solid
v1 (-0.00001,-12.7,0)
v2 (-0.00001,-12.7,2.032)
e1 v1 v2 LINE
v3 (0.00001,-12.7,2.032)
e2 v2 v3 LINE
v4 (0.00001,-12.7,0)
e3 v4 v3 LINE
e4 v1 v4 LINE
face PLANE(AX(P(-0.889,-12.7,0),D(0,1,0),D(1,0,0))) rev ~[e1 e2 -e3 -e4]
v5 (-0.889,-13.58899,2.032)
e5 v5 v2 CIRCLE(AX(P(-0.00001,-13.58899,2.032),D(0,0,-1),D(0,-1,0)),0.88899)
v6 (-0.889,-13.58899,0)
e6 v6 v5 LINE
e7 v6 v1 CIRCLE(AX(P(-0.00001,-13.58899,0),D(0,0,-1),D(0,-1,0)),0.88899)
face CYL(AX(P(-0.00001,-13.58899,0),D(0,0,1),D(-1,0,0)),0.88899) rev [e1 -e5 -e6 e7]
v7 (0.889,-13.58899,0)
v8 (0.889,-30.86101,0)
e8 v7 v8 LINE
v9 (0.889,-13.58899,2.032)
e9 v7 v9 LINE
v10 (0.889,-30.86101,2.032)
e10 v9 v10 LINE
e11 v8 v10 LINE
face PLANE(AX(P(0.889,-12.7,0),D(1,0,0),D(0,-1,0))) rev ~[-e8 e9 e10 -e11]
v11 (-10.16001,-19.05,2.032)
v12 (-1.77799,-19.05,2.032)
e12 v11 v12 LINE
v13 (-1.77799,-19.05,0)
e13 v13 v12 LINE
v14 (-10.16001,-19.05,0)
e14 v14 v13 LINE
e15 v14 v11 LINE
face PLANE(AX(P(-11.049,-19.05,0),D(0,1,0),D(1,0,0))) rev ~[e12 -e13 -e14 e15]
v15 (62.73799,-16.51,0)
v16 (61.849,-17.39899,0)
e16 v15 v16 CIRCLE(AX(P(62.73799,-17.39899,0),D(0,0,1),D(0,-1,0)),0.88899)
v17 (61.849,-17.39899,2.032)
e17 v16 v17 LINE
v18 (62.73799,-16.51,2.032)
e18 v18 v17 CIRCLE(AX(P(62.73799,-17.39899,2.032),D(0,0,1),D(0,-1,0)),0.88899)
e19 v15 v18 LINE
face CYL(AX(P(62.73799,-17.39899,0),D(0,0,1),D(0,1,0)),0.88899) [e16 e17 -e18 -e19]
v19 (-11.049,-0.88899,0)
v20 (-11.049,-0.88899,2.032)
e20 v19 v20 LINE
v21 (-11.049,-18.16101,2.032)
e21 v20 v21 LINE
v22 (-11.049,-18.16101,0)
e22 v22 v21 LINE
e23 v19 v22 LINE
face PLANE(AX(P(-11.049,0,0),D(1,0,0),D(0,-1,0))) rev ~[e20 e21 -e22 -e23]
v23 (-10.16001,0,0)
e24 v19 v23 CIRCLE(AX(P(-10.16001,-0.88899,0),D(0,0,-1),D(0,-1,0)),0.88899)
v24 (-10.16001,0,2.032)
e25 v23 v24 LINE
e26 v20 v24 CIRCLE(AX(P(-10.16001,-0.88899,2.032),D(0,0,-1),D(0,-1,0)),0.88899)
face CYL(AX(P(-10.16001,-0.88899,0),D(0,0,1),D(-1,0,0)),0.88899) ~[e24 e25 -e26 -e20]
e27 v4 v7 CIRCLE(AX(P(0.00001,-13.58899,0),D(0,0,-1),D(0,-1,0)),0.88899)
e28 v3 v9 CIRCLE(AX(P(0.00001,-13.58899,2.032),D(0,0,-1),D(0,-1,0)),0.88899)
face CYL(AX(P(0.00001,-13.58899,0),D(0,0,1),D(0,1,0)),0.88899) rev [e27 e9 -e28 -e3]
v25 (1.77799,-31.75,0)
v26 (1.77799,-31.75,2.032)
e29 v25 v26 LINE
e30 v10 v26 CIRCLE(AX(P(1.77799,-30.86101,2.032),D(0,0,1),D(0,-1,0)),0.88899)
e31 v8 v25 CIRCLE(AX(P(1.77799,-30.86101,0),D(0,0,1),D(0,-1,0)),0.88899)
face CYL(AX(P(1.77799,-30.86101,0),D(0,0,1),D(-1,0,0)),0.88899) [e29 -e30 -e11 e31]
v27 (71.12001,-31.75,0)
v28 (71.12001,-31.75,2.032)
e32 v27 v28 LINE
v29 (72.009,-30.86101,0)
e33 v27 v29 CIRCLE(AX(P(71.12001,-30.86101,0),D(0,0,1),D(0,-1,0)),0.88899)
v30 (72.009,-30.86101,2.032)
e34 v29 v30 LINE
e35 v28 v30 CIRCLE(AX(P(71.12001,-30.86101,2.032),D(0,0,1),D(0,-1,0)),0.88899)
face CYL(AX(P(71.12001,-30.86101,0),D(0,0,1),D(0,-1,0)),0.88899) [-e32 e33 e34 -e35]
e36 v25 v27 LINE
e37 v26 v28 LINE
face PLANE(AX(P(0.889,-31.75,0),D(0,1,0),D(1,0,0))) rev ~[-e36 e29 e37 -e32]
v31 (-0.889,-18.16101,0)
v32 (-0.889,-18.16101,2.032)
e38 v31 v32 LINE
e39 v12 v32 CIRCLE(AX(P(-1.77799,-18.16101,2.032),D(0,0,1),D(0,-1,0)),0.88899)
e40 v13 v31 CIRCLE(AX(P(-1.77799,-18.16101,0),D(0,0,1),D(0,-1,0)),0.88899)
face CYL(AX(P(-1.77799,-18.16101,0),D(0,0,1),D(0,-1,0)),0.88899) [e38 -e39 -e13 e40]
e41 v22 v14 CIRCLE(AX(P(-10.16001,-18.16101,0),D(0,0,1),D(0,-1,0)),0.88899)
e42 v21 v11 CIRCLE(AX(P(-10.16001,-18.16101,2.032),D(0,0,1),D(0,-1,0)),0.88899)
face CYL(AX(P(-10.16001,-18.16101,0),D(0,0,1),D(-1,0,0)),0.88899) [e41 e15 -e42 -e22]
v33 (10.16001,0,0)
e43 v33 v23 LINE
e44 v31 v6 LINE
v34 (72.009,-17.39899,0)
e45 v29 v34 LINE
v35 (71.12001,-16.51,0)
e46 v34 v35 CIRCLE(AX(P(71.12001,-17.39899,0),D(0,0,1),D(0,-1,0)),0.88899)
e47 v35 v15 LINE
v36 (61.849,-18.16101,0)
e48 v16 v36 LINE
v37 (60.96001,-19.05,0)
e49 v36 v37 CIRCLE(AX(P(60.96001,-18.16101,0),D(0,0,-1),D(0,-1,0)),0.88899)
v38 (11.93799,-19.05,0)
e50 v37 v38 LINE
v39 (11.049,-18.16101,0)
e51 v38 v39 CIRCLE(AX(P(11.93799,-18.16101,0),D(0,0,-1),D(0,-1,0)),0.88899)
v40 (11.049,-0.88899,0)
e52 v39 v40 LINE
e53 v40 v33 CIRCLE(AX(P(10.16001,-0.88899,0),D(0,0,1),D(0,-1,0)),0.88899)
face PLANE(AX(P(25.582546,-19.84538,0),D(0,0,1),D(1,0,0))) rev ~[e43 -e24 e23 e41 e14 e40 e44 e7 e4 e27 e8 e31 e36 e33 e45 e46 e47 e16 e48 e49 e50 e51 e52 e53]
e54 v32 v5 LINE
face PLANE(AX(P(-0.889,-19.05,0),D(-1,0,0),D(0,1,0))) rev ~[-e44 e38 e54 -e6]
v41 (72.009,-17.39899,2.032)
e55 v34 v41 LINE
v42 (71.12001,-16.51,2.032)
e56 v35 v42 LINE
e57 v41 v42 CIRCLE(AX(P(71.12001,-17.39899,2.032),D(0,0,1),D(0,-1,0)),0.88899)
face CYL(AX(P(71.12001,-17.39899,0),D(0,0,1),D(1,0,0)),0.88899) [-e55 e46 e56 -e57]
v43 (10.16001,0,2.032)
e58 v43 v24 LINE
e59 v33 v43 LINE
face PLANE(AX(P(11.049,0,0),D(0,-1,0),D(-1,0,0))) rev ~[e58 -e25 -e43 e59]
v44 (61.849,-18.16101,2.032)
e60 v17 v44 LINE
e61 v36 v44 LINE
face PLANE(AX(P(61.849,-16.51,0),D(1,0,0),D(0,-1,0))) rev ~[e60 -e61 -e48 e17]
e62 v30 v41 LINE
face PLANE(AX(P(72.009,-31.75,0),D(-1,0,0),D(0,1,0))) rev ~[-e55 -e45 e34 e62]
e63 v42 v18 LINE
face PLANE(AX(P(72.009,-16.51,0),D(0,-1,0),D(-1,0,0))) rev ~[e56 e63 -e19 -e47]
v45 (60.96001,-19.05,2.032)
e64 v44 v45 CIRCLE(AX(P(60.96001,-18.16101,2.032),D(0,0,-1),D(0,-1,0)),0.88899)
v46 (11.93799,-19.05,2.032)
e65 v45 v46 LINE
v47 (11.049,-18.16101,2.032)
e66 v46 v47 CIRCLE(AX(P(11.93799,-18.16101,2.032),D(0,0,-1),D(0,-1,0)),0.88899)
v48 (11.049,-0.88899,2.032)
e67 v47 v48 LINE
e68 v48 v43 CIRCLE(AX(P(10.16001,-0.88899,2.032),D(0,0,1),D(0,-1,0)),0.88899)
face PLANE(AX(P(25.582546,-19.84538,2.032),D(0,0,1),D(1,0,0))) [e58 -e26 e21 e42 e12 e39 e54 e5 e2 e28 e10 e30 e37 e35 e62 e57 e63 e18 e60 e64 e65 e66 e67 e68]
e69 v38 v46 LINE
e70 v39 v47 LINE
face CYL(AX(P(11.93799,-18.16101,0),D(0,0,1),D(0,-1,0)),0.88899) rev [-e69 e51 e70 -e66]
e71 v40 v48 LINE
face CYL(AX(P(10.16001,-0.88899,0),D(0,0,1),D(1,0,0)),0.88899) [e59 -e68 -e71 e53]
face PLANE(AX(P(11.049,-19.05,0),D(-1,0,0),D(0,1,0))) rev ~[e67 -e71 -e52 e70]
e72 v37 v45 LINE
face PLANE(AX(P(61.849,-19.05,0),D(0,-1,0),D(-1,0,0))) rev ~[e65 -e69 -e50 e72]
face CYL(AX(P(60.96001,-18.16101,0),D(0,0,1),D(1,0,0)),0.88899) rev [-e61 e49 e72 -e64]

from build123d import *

# Parameters (mm, degrees)
F1_DEPTH = 2.032
F2_R     = 0.88899


# Not quite as in the source:
# - a fillet or chamfer is up to 0.001 mm smaller than in the source, because OpenCascade refuses the exact size


with BuildPart() as f1:
    # F0 (on Top) → F1 (new body)
    with BuildSketch(Plane.XY):
        Polygon((-11.049, 0), (-11.049, -19.05), (-0.889, -19.05), (-0.889, -12.7), (0.889, -12.7), (0.889, -31.75), (72.009, -31.75), (72.009, -16.51), (61.849, -16.51), (61.849, -19.05), (11.049, -19.05), (11.049, 0), align=None)
    extrude(amount=F1_DEPTH)

    # F2 (radius 0.889 in the source; OpenCascade refuses exactly that, so slightly less here)
    f2_edges = [f1.edges().sort_by_distance(p)[0] for p in [
        (-0.889, -12.7, 1.016),
        (0.889, -12.7, 1.016),
        (-0.889, -19.05, 1.016),
        (-11.049, -19.05, 1.016),
        (0.889, -31.75, 1.016),
        (11.049, -19.05, 1.016),
        (72.009, -16.51, 1.016),
        (72.009, -31.75, 1.016),
        (61.849, -16.51, 1.016),
        (61.849, -19.05, 1.016),
        (11.049, 0, 1.016),
        (-11.049, 0, 1.016),
    ]]
    fillet(f2_edges, radius=F2_R)


solid = f1.part
